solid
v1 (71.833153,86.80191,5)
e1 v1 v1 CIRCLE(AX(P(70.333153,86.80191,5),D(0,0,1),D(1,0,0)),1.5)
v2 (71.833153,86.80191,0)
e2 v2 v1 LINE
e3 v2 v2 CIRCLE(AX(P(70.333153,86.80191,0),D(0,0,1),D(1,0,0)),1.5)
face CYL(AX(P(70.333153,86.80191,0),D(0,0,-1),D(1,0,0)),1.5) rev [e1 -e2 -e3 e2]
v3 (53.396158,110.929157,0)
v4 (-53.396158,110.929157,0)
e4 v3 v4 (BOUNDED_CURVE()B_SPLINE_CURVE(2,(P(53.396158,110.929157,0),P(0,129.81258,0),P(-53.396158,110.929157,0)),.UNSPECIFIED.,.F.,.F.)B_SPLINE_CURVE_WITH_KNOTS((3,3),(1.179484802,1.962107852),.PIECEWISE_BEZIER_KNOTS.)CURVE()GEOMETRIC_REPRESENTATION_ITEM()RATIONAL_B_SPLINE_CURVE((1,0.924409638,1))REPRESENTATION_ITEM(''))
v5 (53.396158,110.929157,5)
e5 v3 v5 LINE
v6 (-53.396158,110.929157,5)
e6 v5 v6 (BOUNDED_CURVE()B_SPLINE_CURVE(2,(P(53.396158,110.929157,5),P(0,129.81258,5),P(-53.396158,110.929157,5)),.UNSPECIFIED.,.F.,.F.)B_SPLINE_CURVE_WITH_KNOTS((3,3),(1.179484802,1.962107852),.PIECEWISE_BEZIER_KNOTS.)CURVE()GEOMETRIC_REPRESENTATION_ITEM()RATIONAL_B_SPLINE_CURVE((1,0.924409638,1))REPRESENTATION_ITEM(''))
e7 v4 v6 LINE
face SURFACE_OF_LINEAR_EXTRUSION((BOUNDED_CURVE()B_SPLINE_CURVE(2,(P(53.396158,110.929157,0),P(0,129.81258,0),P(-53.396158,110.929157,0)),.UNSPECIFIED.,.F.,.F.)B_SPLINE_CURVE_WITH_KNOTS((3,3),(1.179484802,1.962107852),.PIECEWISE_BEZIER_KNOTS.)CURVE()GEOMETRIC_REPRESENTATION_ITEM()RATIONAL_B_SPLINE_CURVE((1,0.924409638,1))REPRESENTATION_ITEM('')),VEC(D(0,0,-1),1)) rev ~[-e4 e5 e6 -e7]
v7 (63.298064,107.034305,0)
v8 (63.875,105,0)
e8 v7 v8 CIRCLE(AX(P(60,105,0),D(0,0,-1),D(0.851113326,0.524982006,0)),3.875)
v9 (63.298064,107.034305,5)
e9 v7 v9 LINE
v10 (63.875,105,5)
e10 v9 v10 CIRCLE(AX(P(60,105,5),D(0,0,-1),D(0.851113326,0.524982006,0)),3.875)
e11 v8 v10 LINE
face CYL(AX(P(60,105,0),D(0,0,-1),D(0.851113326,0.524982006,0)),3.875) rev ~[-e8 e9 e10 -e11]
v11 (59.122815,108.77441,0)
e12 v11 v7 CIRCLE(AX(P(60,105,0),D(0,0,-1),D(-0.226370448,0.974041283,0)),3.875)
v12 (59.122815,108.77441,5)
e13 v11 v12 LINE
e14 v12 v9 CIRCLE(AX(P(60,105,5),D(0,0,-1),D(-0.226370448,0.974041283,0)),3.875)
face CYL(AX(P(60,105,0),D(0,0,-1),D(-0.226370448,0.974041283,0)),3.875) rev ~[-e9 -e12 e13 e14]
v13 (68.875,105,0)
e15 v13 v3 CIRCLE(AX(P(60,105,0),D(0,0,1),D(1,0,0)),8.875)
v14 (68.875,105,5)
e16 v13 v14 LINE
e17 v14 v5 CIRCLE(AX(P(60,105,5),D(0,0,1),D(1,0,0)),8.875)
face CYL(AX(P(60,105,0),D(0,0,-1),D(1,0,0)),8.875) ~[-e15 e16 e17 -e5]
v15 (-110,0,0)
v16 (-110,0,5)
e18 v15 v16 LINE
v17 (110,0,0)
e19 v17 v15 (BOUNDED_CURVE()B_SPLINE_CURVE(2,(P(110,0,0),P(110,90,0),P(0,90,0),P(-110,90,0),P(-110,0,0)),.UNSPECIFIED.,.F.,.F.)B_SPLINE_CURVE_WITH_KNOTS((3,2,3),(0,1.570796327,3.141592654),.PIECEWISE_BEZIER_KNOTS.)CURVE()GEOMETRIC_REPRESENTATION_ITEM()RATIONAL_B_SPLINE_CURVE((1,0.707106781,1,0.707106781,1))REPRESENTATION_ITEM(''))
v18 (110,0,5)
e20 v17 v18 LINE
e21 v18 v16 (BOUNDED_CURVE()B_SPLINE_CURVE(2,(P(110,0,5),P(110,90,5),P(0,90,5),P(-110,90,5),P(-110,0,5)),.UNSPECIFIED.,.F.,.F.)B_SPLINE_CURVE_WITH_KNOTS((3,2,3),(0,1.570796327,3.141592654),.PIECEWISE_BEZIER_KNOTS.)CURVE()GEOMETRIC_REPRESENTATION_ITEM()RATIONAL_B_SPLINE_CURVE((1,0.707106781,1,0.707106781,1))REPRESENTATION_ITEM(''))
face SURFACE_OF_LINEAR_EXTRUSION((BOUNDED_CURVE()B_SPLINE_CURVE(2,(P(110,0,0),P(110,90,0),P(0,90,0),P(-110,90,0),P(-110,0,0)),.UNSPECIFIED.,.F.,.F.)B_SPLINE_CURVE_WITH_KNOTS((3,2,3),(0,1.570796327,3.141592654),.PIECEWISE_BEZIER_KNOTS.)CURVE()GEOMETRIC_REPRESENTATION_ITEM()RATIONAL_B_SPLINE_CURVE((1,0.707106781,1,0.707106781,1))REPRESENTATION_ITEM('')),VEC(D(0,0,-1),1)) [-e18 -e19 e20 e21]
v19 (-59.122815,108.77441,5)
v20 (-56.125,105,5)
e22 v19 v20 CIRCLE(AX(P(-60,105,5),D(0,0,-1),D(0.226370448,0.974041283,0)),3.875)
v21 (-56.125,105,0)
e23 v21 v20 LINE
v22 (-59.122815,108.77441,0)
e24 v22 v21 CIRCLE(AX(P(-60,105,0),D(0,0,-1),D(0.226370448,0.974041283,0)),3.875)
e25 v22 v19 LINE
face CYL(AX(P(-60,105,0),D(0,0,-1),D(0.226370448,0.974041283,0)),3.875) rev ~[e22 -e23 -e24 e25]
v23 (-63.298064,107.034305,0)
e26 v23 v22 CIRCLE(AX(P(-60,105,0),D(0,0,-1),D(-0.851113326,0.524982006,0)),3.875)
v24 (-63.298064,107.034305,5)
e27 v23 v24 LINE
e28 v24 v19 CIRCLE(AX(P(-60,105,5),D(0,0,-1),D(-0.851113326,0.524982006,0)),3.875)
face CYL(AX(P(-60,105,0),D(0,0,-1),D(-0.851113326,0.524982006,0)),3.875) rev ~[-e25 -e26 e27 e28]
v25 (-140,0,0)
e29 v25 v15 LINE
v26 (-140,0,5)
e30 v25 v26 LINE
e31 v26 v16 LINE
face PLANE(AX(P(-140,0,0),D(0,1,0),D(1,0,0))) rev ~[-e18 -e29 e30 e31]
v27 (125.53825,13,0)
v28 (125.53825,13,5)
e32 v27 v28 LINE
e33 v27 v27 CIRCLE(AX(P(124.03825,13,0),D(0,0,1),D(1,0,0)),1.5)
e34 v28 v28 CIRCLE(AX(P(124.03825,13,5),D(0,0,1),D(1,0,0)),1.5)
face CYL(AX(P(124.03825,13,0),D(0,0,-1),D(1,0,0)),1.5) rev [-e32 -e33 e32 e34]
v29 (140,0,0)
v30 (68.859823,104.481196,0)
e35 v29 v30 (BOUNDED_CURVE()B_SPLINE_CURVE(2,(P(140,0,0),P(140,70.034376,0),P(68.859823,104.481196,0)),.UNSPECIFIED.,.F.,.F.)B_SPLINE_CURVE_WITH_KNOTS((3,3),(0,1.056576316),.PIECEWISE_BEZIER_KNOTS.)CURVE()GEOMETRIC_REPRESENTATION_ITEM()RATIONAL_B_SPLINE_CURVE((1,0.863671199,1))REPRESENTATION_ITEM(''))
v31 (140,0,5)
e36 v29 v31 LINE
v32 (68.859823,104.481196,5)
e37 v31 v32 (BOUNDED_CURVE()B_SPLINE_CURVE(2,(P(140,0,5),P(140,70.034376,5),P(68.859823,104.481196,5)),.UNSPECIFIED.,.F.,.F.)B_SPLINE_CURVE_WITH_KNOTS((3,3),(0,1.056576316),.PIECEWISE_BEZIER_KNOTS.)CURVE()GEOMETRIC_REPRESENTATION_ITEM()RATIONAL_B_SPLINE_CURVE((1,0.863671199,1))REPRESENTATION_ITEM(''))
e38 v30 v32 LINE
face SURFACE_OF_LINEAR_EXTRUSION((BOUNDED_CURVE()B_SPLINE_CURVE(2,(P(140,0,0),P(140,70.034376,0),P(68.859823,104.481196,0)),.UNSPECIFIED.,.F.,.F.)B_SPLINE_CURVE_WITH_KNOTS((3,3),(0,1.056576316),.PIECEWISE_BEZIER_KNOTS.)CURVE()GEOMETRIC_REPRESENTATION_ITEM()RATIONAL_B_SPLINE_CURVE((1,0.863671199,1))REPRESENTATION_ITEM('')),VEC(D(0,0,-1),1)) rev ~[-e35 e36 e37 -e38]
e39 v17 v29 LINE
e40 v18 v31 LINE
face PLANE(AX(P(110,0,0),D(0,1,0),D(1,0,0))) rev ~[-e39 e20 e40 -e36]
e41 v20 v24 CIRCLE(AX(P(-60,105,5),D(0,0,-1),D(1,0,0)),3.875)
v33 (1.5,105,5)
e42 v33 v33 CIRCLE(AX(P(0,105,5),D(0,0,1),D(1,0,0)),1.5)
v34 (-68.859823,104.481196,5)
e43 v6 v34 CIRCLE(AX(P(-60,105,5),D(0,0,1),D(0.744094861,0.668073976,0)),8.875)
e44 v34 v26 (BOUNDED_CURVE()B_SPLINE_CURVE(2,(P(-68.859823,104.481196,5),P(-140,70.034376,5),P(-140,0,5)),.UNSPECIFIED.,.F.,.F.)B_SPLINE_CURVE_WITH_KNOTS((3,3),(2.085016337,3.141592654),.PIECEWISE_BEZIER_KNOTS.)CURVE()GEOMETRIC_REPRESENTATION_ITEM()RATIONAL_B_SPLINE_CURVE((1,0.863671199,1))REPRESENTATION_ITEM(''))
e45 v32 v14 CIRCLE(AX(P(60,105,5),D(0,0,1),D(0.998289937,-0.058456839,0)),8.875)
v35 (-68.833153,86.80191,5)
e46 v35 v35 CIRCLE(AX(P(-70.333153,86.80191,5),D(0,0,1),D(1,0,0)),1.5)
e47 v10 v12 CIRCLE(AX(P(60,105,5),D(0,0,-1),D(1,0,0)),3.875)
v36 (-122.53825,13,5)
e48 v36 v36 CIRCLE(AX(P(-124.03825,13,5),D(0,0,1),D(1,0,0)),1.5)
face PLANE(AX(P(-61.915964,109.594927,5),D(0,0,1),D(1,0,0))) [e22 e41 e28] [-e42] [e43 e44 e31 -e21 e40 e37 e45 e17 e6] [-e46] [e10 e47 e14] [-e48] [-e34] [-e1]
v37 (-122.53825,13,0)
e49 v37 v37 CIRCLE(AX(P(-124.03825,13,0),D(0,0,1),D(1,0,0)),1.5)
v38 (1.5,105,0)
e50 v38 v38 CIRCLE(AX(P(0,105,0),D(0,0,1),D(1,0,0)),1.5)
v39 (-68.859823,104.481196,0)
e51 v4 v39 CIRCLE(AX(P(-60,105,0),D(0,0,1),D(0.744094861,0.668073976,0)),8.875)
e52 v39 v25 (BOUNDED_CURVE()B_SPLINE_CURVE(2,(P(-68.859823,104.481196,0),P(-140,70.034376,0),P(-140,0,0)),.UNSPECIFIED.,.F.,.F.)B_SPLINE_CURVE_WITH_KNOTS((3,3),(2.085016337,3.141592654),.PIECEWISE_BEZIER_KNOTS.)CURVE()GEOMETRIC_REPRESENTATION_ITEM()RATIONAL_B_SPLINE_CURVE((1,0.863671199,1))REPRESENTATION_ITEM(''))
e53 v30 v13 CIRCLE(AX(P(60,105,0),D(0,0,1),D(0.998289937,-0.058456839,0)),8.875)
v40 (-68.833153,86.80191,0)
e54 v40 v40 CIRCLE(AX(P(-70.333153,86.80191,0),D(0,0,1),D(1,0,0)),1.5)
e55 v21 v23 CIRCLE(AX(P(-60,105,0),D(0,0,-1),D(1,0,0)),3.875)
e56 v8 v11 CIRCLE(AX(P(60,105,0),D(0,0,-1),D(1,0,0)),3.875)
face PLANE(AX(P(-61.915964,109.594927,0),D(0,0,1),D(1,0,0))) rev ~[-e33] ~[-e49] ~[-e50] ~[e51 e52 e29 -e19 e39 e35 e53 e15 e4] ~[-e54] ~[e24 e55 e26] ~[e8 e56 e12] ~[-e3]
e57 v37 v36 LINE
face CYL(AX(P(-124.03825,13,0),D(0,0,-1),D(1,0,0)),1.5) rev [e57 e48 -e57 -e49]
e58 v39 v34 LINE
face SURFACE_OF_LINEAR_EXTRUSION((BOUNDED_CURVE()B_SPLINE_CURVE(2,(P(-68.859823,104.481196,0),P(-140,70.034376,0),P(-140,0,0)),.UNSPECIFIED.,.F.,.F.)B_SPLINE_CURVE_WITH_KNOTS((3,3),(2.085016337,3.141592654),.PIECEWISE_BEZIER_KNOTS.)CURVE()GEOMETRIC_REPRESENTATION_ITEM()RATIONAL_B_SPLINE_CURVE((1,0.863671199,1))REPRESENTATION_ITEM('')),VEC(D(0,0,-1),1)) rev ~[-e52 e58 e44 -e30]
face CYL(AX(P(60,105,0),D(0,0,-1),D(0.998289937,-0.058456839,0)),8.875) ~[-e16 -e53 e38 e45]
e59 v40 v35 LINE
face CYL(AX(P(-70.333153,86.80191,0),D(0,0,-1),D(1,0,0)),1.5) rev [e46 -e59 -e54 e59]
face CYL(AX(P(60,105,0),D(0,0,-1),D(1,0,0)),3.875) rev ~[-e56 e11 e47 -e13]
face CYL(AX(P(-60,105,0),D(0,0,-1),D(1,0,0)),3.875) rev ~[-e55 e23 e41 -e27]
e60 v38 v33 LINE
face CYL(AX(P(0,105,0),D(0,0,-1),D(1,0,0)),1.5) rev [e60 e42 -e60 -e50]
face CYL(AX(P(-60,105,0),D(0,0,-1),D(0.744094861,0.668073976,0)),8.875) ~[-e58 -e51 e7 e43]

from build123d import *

# Parameters (mm, degrees)
F0_R     = 1.5
F1_DEPTH = 5


# Not quite as in the source:
# - a feature names something its author has since deleted; it is built from what else it names


with BuildPart() as f1:
    # F0 (on Top) → F1 (new body)
    with BuildSketch(Plane.XY):
        with BuildLine():
            ThreePointArc((-53.3961581093, 110.9291565406), (-63.4156131399, 113.1914108601), (-68.8598231895, 104.4811955556))
            add(Edge.make_bspline(
                [(-63.2980641383, 107.0343052721), (-66.1125104261, 105.8114732046), (-68.8598231895, 104.4811955556)],
                knots=[2.0399471573, 2.0399471573, 2.0399471573, 2.0850163371, 2.0850163371, 2.0850163371], degree=2, weights=[1, 0.9997461069, 1]))
            ThreePointArc((-63.2980641383, 107.0343052721), (-61.4906892533, 108.5767961292), (-59.1228145122, 108.7744099698))
            add(Edge.make_bspline(
                [(-53.3961581093, 110.9291565406), (-56.2875684522, 109.9066162001), (-59.1228145122, 108.7744099698)],
                knots=[1.962107852, 1.962107852, 1.962107852, 2.0067839239, 2.0067839239, 2.0067839239], degree=2, weights=[1, 0.9997505164, 1]))
        make_face()
        with BuildLine():
            add(Edge.make_bspline(
                [(-63.2980641383, 107.0343052721), (-66.1125104261, 105.8114732046), (-68.8598231895, 104.4811955556)],
                knots=[2.0399471573, 2.0399471573, 2.0399471573, 2.0850163371, 2.0850163371, 2.0850163371], degree=2, weights=[1, 0.9997461069, 1]))
            ThreePointArc((-68.8598231895, 104.4811955556), (-59.7404868081, 96.128795014), (-51.125, 105))
            ThreePointArc((-51.125, 105), (-51.7122161654, 108.1746281846), (-53.3961581093, 110.9291565406))
            add(Edge.make_bspline(
                [(-53.3961581093, 110.9291565406), (-56.2875684522, 109.9066162001), (-59.1228145122, 108.7744099698)],
                knots=[1.962107852, 1.962107852, 1.962107852, 2.0067839239, 2.0067839239, 2.0067839239], degree=2, weights=[1, 0.9997505164, 1]))
            ThreePointArc((-59.1228145122, 108.7744099698), (-56.9656369066, 107.4100343602), (-56.125, 105))
            ThreePointArc((-56.125, 105), (-61.0572668689, 101.2720230999), (-63.2980641383, 107.0343052721))
        make_face()
        with BuildLine():
            add(Edge.make_bspline(
                [(-68.8598231895, 104.4811955556), (-140, 70.0343759485), (-140, 0)],
                knots=[2.0850163371, 2.0850163371, 2.0850163371, 3.1415926536, 3.1415926536, 3.1415926536], degree=2, weights=[1, 0.863671199, 1]))
            Line((-140, 0), (-110, 0))
            add(Edge.make_bspline(
                [(110, 0), (110, 90), (0, 90), (-110, 90), (-110, 0)],
                knots=[0, 0, 0, 1.5707963268, 1.5707963268, 3.1415926536, 3.1415926536, 3.1415926536], degree=2, weights=[1, 0.7071067812, 1, 0.7071067812, 1]))
            Line((110, 0), (140, 0))
            add(Edge.make_bspline(
                [(140, 0), (140, 70.0343759485), (68.8598231895, 104.4811955556)],
                knots=[0, 0, 0, 1.0565763165, 1.0565763165, 1.0565763165], degree=2, weights=[1, 0.863671199, 1]))
            ThreePointArc((68.8598231895, 104.4811955556), (56.5843868601, 96.8085891399), (53.3961581093, 110.9291565406))
            add(Edge.make_bspline(
                [(53.3961581093, 110.9291565406), (0, 129.81257993), (-53.3961581093, 110.9291565406)],
                knots=[1.1794848016, 1.1794848016, 1.1794848016, 1.962107852, 1.962107852, 1.962107852], degree=2, weights=[1, 0.9244096378, 1]))
            ThreePointArc((-53.3961581093, 110.9291565406), (-51.7122161654, 108.1746281846), (-51.125, 105))
            ThreePointArc((-51.125, 105), (-59.7404868081, 96.128795014), (-68.8598231895, 104.4811955556))
        make_face()
        with Locations((-124.0382502632, 13)):
            Circle(F0_R, mode=Mode.SUBTRACT)
        with Locations((-70.333152659, 86.8019097296)):
            Circle(F0_R, mode=Mode.SUBTRACT)
        with Locations((124.0382502632, 13)):
            Circle(F0_R, mode=Mode.SUBTRACT)
        with Locations((0, 105)):
            Circle(F0_R, mode=Mode.SUBTRACT)
        with Locations((70.333152659, 86.8019097296)):
            Circle(F0_R, mode=Mode.SUBTRACT)
        with BuildLine():
            add(Edge.make_bspline(
                [(68.8598231895, 104.4811955556), (66.1125104261, 105.8114732046), (63.2980641383, 107.0343052721)],
                knots=[1.0565763165, 1.0565763165, 1.0565763165, 1.1016454963, 1.1016454963, 1.1016454963], degree=2, weights=[1, 0.9997461069, 1]))
            ThreePointArc((68.8598231895, 104.4811955556), (68.871204986, 104.7404868081), (68.875, 105))
            ThreePointArc((68.875, 105), (63.1746281846, 113.2877838346), (53.3961581093, 110.9291565406))
            add(Edge.make_bspline(
                [(59.1228145122, 108.7744099698), (56.2875684522, 109.9066162001), (53.3961581093, 110.9291565406)],
                knots=[1.1348087297, 1.1348087297, 1.1348087297, 1.1794848016, 1.1794848016, 1.1794848016], degree=2, weights=[1, 0.9997505164, 1]))
            ThreePointArc((59.1228145122, 108.7744099698), (61.4906892533, 108.5767961292), (63.2980641383, 107.0343052721))
        make_face()
        with BuildLine():
            ThreePointArc((53.3961581093, 110.9291565406), (56.5843868601, 96.8085891399), (68.8598231895, 104.4811955556))
            add(Edge.make_bspline(
                [(68.8598231895, 104.4811955556), (66.1125104261, 105.8114732046), (63.2980641383, 107.0343052721)],
                knots=[1.0565763165, 1.0565763165, 1.0565763165, 1.1016454963, 1.1016454963, 1.1016454963], degree=2, weights=[1, 0.9997461069, 1]))
            ThreePointArc((63.2980641383, 107.0343052721), (63.7279769001, 106.0572668689), (63.875, 105))
            ThreePointArc((63.875, 105), (57.5899656398, 101.9656369066), (59.1228145122, 108.7744099698))
            add(Edge.make_bspline(
                [(59.1228145122, 108.7744099698), (56.2875684522, 109.9066162001), (53.3961581093, 110.9291565406)],
                knots=[1.1348087297, 1.1348087297, 1.1348087297, 1.1794848016, 1.1794848016, 1.1794848016], degree=2, weights=[1, 0.9997505164, 1]))
        make_face()
    extrude(amount=F1_DEPTH)


solid = f1.part
